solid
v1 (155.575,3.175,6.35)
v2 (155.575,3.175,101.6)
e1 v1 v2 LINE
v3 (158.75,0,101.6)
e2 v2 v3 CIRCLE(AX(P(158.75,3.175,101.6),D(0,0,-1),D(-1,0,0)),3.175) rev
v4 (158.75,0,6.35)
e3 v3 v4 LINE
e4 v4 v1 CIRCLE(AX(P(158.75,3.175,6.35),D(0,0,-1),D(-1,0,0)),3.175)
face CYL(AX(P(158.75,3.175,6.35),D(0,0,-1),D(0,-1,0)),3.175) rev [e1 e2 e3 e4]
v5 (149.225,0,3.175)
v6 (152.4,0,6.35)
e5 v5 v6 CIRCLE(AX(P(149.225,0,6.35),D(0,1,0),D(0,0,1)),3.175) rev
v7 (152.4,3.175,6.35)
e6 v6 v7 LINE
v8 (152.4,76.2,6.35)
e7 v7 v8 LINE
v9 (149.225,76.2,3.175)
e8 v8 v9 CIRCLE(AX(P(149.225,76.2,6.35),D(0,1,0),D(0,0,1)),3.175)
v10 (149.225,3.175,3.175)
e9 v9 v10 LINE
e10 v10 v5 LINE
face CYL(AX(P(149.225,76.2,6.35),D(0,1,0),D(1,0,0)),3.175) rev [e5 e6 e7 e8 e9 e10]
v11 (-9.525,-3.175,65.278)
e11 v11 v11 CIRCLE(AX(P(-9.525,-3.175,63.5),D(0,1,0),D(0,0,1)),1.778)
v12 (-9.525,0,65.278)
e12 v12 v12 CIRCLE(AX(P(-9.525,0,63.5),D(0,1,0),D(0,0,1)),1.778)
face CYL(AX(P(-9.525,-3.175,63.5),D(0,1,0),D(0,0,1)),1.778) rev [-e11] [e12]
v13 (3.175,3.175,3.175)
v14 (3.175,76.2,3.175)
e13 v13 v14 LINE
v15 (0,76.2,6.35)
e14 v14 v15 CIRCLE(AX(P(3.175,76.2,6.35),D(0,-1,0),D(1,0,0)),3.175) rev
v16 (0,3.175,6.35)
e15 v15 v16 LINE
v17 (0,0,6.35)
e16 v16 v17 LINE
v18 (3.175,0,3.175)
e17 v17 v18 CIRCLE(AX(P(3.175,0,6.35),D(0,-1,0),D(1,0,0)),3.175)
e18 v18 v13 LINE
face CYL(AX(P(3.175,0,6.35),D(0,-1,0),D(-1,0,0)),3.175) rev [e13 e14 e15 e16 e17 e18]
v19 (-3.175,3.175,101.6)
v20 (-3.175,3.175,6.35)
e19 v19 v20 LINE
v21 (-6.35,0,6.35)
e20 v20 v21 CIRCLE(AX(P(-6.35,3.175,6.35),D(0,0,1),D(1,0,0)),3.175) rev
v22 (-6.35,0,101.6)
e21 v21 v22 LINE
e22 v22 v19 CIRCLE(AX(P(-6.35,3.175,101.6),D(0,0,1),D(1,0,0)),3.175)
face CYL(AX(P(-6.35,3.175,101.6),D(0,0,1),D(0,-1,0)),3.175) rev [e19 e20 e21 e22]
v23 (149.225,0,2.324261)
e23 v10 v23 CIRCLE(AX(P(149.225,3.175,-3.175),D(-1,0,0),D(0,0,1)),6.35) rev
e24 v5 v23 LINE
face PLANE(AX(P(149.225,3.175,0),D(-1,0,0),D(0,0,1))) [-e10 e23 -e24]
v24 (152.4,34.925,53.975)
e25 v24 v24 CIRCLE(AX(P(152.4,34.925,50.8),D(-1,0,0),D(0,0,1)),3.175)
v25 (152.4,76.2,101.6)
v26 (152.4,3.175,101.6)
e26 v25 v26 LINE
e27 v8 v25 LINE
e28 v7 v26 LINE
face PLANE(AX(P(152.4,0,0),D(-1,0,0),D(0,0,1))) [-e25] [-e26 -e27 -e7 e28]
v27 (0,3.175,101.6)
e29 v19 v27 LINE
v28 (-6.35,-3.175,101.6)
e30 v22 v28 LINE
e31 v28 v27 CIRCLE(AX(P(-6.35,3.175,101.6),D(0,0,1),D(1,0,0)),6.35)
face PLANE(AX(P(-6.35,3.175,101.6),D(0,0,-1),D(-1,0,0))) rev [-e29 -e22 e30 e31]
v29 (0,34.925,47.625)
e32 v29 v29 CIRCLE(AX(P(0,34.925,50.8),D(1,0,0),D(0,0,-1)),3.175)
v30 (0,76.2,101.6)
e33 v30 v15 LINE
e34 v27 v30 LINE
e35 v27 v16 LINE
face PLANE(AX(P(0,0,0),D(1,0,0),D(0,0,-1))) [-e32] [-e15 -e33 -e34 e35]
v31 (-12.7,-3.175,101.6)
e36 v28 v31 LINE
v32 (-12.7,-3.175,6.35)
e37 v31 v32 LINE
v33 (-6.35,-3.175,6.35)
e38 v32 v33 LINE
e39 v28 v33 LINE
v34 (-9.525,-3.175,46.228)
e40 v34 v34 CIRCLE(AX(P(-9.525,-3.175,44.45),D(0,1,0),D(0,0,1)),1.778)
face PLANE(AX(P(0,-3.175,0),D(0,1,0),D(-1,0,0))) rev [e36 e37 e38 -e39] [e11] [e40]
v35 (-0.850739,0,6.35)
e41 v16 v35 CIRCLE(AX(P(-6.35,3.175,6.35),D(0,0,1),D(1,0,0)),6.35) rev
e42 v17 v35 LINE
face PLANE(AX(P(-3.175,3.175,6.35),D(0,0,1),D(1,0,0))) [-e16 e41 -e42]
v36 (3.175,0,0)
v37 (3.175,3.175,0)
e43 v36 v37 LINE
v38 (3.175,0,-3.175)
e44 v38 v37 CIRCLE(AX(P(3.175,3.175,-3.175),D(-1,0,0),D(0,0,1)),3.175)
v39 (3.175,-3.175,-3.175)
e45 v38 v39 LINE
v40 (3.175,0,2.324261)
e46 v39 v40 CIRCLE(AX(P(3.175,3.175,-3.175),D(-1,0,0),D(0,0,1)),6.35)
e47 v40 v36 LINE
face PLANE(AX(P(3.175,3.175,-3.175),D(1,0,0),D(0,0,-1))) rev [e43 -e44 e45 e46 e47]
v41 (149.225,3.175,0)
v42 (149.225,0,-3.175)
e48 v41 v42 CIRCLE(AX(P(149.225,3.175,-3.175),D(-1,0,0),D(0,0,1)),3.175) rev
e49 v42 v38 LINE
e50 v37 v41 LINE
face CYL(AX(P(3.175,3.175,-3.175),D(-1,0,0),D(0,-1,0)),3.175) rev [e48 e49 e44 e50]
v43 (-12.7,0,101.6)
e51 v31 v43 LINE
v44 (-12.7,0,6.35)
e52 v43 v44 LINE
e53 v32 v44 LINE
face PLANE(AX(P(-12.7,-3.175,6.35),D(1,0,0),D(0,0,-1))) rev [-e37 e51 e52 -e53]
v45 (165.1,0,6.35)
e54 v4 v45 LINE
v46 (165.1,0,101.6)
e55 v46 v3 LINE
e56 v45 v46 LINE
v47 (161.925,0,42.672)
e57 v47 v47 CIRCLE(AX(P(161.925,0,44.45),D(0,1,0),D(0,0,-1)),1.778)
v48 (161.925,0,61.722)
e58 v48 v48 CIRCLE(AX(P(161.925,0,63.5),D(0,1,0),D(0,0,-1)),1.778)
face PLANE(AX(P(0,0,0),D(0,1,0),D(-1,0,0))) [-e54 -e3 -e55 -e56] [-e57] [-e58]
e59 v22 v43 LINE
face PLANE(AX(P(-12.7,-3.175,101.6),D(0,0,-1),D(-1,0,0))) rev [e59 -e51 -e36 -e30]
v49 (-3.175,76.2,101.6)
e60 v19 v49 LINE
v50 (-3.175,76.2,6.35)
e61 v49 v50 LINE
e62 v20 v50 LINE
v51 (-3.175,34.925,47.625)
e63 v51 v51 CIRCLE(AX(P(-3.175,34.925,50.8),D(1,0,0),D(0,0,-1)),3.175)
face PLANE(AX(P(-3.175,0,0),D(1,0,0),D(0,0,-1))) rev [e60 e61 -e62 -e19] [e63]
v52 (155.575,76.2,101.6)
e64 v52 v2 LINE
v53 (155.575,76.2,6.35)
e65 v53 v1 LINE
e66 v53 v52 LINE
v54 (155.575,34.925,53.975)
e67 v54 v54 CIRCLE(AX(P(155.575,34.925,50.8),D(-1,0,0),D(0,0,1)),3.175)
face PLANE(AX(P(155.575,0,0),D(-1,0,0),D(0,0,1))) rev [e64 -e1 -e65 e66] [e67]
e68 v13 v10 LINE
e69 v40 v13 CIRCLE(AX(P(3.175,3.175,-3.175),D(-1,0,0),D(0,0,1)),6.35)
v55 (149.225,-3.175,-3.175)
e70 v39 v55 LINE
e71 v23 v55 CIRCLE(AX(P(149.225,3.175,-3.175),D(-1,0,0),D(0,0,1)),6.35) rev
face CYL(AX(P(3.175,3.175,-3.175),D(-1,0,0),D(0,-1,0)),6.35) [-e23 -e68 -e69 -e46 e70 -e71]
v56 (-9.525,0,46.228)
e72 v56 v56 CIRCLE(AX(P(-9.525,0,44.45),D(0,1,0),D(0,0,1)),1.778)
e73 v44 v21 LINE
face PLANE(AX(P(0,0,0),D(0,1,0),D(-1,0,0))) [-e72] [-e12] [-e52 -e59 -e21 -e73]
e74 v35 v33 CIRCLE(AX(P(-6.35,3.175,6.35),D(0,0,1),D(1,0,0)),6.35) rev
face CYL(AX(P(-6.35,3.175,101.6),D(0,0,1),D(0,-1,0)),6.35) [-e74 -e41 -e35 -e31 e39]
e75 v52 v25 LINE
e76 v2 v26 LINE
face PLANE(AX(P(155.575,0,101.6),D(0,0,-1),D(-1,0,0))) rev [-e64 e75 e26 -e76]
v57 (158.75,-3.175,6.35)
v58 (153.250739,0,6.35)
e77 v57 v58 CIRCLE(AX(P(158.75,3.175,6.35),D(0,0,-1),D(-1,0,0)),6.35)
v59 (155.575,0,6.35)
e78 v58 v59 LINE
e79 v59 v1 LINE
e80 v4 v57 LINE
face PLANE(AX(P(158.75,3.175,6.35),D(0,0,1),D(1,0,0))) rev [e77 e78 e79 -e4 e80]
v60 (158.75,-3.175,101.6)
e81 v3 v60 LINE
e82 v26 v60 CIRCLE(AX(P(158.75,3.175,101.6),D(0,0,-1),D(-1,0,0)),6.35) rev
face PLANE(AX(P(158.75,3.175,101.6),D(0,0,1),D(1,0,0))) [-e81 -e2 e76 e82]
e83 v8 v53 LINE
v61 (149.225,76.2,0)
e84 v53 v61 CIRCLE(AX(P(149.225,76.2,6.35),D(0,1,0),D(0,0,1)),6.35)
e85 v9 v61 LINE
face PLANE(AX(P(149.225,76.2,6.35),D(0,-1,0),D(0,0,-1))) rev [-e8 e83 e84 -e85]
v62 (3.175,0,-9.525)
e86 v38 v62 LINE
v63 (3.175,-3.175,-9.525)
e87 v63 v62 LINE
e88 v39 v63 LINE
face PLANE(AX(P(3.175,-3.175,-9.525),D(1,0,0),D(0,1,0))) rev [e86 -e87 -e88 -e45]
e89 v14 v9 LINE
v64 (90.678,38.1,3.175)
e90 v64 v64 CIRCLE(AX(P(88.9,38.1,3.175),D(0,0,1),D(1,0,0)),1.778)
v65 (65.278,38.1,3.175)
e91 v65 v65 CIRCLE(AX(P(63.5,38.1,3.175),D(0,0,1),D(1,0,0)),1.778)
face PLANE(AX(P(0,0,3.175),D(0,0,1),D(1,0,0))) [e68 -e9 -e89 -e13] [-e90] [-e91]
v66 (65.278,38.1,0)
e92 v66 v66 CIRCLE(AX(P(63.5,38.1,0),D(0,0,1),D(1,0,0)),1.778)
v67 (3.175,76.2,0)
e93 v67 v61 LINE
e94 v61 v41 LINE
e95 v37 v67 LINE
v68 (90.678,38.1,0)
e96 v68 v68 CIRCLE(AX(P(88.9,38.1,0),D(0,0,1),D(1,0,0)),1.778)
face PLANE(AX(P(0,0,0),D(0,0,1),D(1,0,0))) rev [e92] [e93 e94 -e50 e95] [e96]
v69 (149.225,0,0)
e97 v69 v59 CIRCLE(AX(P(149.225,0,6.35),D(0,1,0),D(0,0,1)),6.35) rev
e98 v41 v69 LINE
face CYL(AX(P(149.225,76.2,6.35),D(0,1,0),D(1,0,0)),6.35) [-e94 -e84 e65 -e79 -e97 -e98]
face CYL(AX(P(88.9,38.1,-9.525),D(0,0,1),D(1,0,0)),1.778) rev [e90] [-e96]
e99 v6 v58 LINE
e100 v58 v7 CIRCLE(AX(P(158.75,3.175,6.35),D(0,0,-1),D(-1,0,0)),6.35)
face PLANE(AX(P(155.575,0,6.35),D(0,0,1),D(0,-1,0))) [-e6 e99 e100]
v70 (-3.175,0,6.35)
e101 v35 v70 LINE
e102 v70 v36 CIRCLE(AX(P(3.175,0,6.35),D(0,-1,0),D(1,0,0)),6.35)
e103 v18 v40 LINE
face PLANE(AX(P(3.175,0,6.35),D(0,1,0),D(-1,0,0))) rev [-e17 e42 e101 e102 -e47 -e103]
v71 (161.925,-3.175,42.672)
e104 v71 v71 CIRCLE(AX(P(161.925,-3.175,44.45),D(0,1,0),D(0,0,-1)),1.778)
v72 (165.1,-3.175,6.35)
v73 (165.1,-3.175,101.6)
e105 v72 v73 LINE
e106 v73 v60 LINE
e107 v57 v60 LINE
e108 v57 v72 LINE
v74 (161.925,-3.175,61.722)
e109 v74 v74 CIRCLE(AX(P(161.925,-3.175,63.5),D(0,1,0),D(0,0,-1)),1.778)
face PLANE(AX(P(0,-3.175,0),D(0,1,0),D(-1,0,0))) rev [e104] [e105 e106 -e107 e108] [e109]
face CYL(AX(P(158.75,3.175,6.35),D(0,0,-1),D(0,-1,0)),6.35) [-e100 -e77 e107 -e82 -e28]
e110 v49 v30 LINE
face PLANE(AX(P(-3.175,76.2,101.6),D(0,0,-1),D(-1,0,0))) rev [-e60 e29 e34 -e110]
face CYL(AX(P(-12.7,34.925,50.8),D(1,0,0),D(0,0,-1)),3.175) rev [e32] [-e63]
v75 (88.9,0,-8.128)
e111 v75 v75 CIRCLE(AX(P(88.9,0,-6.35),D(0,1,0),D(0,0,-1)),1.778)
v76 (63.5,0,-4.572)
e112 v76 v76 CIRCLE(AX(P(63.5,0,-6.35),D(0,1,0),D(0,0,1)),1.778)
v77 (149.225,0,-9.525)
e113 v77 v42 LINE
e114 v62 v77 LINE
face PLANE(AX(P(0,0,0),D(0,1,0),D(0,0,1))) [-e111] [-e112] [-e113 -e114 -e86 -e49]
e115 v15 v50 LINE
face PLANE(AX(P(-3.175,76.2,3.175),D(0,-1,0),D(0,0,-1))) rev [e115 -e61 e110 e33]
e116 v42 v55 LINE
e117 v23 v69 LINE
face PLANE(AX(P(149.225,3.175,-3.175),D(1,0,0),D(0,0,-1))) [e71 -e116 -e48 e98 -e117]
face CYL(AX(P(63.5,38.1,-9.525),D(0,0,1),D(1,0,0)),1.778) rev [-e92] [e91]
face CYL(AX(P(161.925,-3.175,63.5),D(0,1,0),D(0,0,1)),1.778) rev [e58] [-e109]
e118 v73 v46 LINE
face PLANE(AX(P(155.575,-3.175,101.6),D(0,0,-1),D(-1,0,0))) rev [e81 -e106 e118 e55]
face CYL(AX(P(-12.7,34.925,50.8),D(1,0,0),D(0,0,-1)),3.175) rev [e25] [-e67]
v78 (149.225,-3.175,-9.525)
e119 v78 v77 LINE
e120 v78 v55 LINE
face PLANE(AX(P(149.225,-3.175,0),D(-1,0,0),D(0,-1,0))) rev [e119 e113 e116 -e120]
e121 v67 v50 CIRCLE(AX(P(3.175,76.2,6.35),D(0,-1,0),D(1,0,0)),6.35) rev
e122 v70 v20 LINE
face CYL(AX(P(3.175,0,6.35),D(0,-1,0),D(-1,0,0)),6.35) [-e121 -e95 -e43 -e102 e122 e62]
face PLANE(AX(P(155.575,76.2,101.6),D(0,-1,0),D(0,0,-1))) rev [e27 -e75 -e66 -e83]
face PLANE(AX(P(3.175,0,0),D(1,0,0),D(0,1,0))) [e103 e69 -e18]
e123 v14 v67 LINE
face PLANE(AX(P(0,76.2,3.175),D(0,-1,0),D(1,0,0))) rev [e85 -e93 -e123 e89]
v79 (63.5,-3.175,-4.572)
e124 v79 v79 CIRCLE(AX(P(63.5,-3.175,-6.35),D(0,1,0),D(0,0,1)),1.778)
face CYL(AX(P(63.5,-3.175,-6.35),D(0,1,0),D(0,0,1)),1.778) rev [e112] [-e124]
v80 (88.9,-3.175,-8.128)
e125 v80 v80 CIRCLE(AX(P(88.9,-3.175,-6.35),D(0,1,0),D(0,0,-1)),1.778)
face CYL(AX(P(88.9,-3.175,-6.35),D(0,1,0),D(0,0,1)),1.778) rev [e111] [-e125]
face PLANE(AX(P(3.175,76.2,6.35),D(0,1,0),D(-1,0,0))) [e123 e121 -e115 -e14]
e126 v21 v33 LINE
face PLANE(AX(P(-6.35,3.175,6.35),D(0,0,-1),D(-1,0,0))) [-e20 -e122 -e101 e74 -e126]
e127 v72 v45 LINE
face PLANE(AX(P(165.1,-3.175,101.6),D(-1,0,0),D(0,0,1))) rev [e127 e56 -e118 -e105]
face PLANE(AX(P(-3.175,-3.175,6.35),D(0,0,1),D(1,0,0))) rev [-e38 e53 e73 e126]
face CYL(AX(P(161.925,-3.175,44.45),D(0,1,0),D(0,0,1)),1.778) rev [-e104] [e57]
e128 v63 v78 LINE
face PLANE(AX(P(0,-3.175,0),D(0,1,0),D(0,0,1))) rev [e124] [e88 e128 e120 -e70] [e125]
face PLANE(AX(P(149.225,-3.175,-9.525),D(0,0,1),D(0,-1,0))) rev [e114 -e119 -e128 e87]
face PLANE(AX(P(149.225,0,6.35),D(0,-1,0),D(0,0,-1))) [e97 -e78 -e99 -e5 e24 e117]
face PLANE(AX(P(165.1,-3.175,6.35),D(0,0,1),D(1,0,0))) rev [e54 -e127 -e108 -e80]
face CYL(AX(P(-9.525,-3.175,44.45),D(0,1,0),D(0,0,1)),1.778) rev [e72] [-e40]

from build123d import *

# Parameters (mm, degrees)
SKETCH1_W                    = 152.4
SKETCH1_H                    = 76.2
BOSS_EXTRUDE1_DEPTH          = 3.175
EDGE_FLANGE5_STRIP_W         = 19.05
EDGE_FLANGE5_STRIP_H         = 3.175
EDGE_FLANGE5_STRIP_CUT_DEPTH = 76.2
EDGE_FLANGE5_DEPTH           = 76.2
EDGE_FLANGE6_STRIP_W         = 19.05
EDGE_FLANGE6_STRIP_H         = 3.175
EDGE_FLANGE6_STRIP_CUT_DEPTH = 76.2
EDGE_FLANGE6_DEPTH           = 76.2
EDGE_FLANGE7_STRIP_W         = 19.05
EDGE_FLANGE7_STRIP_H         = 3.175
EDGE_FLANGE7_STRIP_CUT_DEPTH = 146.05
EDGE_FLANGE7_DEPTH           = 146.05
EDGE_FLANGE8_STRIP_W         = 19.05
EDGE_FLANGE8_STRIP_H         = 3.175
EDGE_FLANGE8_STRIP_CUT_DEPTH = 95.25
EDGE_FLANGE8_DEPTH           = 95.25
EDGE_FLANGE9_STRIP_W         = 19.05
EDGE_FLANGE9_STRIP_H         = 3.175
EDGE_FLANGE9_STRIP_CUT_DEPTH = 95.25
EDGE_FLANGE9_DEPTH           = 95.25
CUT_EXTRUDE1_DEPTH           = 211.820956323
CUT_EXTRUDE1_DEPTH_BACK      = 211.820956323
SKETCH60_R                   = 3.175
CUT_EXTRUDE2_DEPTH           = 207.765399971
CUT_EXTRUDE2_DEPTH_BACK      = 207.765399971
SKETCH61_R                   = 1.778
CUT_EXTRUDE3_DEPTH           = 209.295487229
CUT_EXTRUDE3_DEPTH_BACK      = 209.295487229
SKETCH62_R                   = 1.778


# Sheet-metal steps are written as plain solids
with BuildPart() as part:
    # Sketch1 → Boss-Extrude1 (new body)
    with BuildSketch(Plane.XY):
        with Locations((76.2, 38.1)):
            Rectangle(SKETCH1_W, SKETCH1_H)
    extrude(amount=BOSS_EXTRUDE1_DEPTH)

    # Edge-Flange5 strip (across the edge) → Edge-Flange5 strip cut (cut)
    with BuildSketch(Plane(origin=(152.4, 0, 3.175), x_dir=(-1, 0, 0), z_dir=(0, 1, 0))):
        with Locations((-6.35, -1.5875)):
            Rectangle(EDGE_FLANGE5_STRIP_W, EDGE_FLANGE5_STRIP_H)
    extrude(amount=EDGE_FLANGE5_STRIP_CUT_DEPTH, mode=Mode.SUBTRACT)

    # Edge-Flange5 section (across the edge) → Edge-Flange5 (add)
    with BuildSketch(Plane(origin=(152.4, 0, 3.175), x_dir=(-1, 0, 0), z_dir=(0, 1, 0))):
        with BuildLine():
            Line((-3.175, 3.175), (-3.175, 98.425))
            Line((-3.175, 98.425), (0, 98.425))
            Line((0, 98.425), (0, 3.175))
            ThreePointArc((0, 3.175), (0.92993597, 0.92993597), (3.175, 0))
            Line((3.175, 0), (3.175, -3.175))
            ThreePointArc((3.175, -3.175), (-1.315128061, -1.315128061), (-3.175, 3.175))
        make_face()
    extrude(amount=EDGE_FLANGE5_DEPTH)

    # Edge-Flange6 strip (across the edge) → Edge-Flange6 strip cut (cut)
    with BuildSketch(Plane(origin=(0, 76.2, 3.175), x_dir=(1, 0, 0), z_dir=(0, -1, 0))):
        with Locations((-6.35, -1.5875)):
            Rectangle(EDGE_FLANGE6_STRIP_W, EDGE_FLANGE6_STRIP_H)
    extrude(amount=EDGE_FLANGE6_STRIP_CUT_DEPTH, mode=Mode.SUBTRACT)

    # Edge-Flange6 section (across the edge) → Edge-Flange6 (add)
    with BuildSketch(Plane(origin=(0, 76.2, 3.175), x_dir=(1, 0, 0), z_dir=(0, -1, 0))):
        with BuildLine():
            Line((-3.175, 3.175), (-3.175, 98.425))
            Line((-3.175, 98.425), (0, 98.425))
            Line((0, 98.425), (0, 3.175))
            ThreePointArc((0, 3.175), (0.92993597, 0.92993597), (3.175, 0))
            Line((3.175, 0), (3.175, -3.175))
            ThreePointArc((3.175, -3.175), (-1.315128061, -1.315128061), (-3.175, 3.175))
        make_face()
    extrude(amount=EDGE_FLANGE6_DEPTH)

    # Edge-Flange7 strip (across the edge) → Edge-Flange7 strip cut (cut)
    with BuildSketch(Plane(origin=(149.225, 0, 0), x_dir=(0, 1, 0), z_dir=(-1, 0, 0))):
        with Locations((-6.35, -1.5875)):
            Rectangle(EDGE_FLANGE7_STRIP_W, EDGE_FLANGE7_STRIP_H)
    extrude(amount=EDGE_FLANGE7_STRIP_CUT_DEPTH, mode=Mode.SUBTRACT)

    # Edge-Flange7 section (across the edge) → Edge-Flange7 (add)
    with BuildSketch(Plane(origin=(149.225, 0, 0), x_dir=(0, 1, 0), z_dir=(-1, 0, 0))):
        with BuildLine():
            Line((-3.175, 3.175), (-3.175, 9.525))
            Line((-3.175, 9.525), (0, 9.525))
            Line((0, 9.525), (0, 3.175))
            ThreePointArc((0, 3.175), (0.92993597, 0.92993597), (3.175, 0))
            Line((3.175, 0), (3.175, -3.175))
            ThreePointArc((3.175, -3.175), (-1.315128061, -1.315128061), (-3.175, 3.175))
        make_face()
    extrude(amount=EDGE_FLANGE7_DEPTH)

    # Edge-Flange8 strip (across the edge) → Edge-Flange8 strip cut (cut)
    with BuildSketch(Plane(origin=(155.575, 0, 101.6), x_dir=(0, 1, 0), z_dir=(0, 0, -1))):
        with Locations((-6.35, -1.5875)):
            Rectangle(EDGE_FLANGE8_STRIP_W, EDGE_FLANGE8_STRIP_H)
    extrude(amount=EDGE_FLANGE8_STRIP_CUT_DEPTH, mode=Mode.SUBTRACT)

    # Edge-Flange8 section (across the edge) → Edge-Flange8 (add)
    with BuildSketch(Plane(origin=(155.575, 0, 101.6), x_dir=(0, 1, 0), z_dir=(0, 0, -1))):
        with BuildLine():
            Line((-3.175, 3.175), (-3.175, 9.525))
            Line((-3.175, 9.525), (0, 9.525))
            Line((0, 9.525), (0, 3.175))
            ThreePointArc((0, 3.175), (0.92993597, 0.92993597), (3.175, 0))
            Line((3.175, 0), (3.175, -3.175))
            ThreePointArc((3.175, -3.175), (-1.315128061, -1.315128061), (-3.175, 3.175))
        make_face()
    extrude(amount=EDGE_FLANGE8_DEPTH)

    # Edge-Flange9 strip (across the edge) → Edge-Flange9 strip cut (cut)
    with BuildSketch(Plane(origin=(-3.175, 0, 6.35), x_dir=(0, 1, 0), z_dir=(0, 0, 1))):
        with Locations((-6.35, -1.5875)):
            Rectangle(EDGE_FLANGE9_STRIP_W, EDGE_FLANGE9_STRIP_H)
    extrude(amount=EDGE_FLANGE9_STRIP_CUT_DEPTH, mode=Mode.SUBTRACT)

    # Edge-Flange9 section (across the edge) → Edge-Flange9 (add)
    with BuildSketch(Plane(origin=(-3.175, 0, 6.35), x_dir=(0, 1, 0), z_dir=(0, 0, 1))):
        with BuildLine():
            Line((-3.175, 3.175), (-3.175, 9.525))
            Line((-3.175, 9.525), (0, 9.525))
            Line((0, 9.525), (0, 3.175))
            ThreePointArc((0, 3.175), (0.92993597, 0.92993597), (3.175, 0))
            Line((3.175, 0), (3.175, -3.175))
            ThreePointArc((3.175, -3.175), (-1.315128061, -1.315128061), (-3.175, 3.175))
        make_face()
    extrude(amount=EDGE_FLANGE9_DEPTH)

    # Sketch60 → Cut-Extrude1 (cut, two sides: drawn at the far end of the back side and taken through both)
    with BuildSketch(Plane(origin=(155.575, 0, 0), x_dir=(0, 0, -1), z_dir=(1, 0, 0)).offset(-CUT_EXTRUDE1_DEPTH_BACK)):
        with Locations(Location((-50.8, 34.925, 0), (0, 0, 180))):
            Circle(SKETCH60_R)
    extrude(amount=CUT_EXTRUDE1_DEPTH + CUT_EXTRUDE1_DEPTH_BACK, mode=Mode.SUBTRACT)

    # Sketch61 → Cut-Extrude2 (cut, two sides: drawn at the far end of the back side and taken through both)
    with BuildSketch(Plane.XY.offset(3.175).offset(-CUT_EXTRUDE2_DEPTH_BACK)):
        with Locations((88.9, 38.1)):
            Circle(SKETCH61_R)
        with Locations((63.5, 38.1)):
            Circle(SKETCH61_R)
    extrude(amount=CUT_EXTRUDE2_DEPTH + CUT_EXTRUDE2_DEPTH_BACK, mode=Mode.SUBTRACT)

    # Sketch62 → Cut-Extrude3 (cut, two sides: drawn at the far end of the back side and taken through both)
    with BuildSketch(Plane(origin=(0, 0, 0), x_dir=(1, 0, 0), z_dir=(0, 1, 0)).offset(-CUT_EXTRUDE3_DEPTH_BACK)):
        with Locations(Location((63.5, 6.35, 0), (0, 0, 270))):
            Circle(SKETCH62_R)
        with Locations(Location((-9.525, -44.45, 0), (0, 0, 270))):
            Circle(SKETCH62_R)
        with Locations(Location((-9.525, -63.5, 0), (0, 0, 270))):
            Circle(SKETCH62_R)
        with Locations(Location((161.925, -63.5, 0), (0, 0, 90))):
            Circle(SKETCH62_R)
        with Locations(Location((161.925, -44.45, 0), (0, 0, 90))):
            Circle(SKETCH62_R)
        with Locations(Location((88.9, 6.35, 0), (0, 0, 90))):
            Circle(SKETCH62_R)
    extrude(amount=CUT_EXTRUDE3_DEPTH + CUT_EXTRUDE3_DEPTH_BACK, mode=Mode.SUBTRACT)


solid = part.part
